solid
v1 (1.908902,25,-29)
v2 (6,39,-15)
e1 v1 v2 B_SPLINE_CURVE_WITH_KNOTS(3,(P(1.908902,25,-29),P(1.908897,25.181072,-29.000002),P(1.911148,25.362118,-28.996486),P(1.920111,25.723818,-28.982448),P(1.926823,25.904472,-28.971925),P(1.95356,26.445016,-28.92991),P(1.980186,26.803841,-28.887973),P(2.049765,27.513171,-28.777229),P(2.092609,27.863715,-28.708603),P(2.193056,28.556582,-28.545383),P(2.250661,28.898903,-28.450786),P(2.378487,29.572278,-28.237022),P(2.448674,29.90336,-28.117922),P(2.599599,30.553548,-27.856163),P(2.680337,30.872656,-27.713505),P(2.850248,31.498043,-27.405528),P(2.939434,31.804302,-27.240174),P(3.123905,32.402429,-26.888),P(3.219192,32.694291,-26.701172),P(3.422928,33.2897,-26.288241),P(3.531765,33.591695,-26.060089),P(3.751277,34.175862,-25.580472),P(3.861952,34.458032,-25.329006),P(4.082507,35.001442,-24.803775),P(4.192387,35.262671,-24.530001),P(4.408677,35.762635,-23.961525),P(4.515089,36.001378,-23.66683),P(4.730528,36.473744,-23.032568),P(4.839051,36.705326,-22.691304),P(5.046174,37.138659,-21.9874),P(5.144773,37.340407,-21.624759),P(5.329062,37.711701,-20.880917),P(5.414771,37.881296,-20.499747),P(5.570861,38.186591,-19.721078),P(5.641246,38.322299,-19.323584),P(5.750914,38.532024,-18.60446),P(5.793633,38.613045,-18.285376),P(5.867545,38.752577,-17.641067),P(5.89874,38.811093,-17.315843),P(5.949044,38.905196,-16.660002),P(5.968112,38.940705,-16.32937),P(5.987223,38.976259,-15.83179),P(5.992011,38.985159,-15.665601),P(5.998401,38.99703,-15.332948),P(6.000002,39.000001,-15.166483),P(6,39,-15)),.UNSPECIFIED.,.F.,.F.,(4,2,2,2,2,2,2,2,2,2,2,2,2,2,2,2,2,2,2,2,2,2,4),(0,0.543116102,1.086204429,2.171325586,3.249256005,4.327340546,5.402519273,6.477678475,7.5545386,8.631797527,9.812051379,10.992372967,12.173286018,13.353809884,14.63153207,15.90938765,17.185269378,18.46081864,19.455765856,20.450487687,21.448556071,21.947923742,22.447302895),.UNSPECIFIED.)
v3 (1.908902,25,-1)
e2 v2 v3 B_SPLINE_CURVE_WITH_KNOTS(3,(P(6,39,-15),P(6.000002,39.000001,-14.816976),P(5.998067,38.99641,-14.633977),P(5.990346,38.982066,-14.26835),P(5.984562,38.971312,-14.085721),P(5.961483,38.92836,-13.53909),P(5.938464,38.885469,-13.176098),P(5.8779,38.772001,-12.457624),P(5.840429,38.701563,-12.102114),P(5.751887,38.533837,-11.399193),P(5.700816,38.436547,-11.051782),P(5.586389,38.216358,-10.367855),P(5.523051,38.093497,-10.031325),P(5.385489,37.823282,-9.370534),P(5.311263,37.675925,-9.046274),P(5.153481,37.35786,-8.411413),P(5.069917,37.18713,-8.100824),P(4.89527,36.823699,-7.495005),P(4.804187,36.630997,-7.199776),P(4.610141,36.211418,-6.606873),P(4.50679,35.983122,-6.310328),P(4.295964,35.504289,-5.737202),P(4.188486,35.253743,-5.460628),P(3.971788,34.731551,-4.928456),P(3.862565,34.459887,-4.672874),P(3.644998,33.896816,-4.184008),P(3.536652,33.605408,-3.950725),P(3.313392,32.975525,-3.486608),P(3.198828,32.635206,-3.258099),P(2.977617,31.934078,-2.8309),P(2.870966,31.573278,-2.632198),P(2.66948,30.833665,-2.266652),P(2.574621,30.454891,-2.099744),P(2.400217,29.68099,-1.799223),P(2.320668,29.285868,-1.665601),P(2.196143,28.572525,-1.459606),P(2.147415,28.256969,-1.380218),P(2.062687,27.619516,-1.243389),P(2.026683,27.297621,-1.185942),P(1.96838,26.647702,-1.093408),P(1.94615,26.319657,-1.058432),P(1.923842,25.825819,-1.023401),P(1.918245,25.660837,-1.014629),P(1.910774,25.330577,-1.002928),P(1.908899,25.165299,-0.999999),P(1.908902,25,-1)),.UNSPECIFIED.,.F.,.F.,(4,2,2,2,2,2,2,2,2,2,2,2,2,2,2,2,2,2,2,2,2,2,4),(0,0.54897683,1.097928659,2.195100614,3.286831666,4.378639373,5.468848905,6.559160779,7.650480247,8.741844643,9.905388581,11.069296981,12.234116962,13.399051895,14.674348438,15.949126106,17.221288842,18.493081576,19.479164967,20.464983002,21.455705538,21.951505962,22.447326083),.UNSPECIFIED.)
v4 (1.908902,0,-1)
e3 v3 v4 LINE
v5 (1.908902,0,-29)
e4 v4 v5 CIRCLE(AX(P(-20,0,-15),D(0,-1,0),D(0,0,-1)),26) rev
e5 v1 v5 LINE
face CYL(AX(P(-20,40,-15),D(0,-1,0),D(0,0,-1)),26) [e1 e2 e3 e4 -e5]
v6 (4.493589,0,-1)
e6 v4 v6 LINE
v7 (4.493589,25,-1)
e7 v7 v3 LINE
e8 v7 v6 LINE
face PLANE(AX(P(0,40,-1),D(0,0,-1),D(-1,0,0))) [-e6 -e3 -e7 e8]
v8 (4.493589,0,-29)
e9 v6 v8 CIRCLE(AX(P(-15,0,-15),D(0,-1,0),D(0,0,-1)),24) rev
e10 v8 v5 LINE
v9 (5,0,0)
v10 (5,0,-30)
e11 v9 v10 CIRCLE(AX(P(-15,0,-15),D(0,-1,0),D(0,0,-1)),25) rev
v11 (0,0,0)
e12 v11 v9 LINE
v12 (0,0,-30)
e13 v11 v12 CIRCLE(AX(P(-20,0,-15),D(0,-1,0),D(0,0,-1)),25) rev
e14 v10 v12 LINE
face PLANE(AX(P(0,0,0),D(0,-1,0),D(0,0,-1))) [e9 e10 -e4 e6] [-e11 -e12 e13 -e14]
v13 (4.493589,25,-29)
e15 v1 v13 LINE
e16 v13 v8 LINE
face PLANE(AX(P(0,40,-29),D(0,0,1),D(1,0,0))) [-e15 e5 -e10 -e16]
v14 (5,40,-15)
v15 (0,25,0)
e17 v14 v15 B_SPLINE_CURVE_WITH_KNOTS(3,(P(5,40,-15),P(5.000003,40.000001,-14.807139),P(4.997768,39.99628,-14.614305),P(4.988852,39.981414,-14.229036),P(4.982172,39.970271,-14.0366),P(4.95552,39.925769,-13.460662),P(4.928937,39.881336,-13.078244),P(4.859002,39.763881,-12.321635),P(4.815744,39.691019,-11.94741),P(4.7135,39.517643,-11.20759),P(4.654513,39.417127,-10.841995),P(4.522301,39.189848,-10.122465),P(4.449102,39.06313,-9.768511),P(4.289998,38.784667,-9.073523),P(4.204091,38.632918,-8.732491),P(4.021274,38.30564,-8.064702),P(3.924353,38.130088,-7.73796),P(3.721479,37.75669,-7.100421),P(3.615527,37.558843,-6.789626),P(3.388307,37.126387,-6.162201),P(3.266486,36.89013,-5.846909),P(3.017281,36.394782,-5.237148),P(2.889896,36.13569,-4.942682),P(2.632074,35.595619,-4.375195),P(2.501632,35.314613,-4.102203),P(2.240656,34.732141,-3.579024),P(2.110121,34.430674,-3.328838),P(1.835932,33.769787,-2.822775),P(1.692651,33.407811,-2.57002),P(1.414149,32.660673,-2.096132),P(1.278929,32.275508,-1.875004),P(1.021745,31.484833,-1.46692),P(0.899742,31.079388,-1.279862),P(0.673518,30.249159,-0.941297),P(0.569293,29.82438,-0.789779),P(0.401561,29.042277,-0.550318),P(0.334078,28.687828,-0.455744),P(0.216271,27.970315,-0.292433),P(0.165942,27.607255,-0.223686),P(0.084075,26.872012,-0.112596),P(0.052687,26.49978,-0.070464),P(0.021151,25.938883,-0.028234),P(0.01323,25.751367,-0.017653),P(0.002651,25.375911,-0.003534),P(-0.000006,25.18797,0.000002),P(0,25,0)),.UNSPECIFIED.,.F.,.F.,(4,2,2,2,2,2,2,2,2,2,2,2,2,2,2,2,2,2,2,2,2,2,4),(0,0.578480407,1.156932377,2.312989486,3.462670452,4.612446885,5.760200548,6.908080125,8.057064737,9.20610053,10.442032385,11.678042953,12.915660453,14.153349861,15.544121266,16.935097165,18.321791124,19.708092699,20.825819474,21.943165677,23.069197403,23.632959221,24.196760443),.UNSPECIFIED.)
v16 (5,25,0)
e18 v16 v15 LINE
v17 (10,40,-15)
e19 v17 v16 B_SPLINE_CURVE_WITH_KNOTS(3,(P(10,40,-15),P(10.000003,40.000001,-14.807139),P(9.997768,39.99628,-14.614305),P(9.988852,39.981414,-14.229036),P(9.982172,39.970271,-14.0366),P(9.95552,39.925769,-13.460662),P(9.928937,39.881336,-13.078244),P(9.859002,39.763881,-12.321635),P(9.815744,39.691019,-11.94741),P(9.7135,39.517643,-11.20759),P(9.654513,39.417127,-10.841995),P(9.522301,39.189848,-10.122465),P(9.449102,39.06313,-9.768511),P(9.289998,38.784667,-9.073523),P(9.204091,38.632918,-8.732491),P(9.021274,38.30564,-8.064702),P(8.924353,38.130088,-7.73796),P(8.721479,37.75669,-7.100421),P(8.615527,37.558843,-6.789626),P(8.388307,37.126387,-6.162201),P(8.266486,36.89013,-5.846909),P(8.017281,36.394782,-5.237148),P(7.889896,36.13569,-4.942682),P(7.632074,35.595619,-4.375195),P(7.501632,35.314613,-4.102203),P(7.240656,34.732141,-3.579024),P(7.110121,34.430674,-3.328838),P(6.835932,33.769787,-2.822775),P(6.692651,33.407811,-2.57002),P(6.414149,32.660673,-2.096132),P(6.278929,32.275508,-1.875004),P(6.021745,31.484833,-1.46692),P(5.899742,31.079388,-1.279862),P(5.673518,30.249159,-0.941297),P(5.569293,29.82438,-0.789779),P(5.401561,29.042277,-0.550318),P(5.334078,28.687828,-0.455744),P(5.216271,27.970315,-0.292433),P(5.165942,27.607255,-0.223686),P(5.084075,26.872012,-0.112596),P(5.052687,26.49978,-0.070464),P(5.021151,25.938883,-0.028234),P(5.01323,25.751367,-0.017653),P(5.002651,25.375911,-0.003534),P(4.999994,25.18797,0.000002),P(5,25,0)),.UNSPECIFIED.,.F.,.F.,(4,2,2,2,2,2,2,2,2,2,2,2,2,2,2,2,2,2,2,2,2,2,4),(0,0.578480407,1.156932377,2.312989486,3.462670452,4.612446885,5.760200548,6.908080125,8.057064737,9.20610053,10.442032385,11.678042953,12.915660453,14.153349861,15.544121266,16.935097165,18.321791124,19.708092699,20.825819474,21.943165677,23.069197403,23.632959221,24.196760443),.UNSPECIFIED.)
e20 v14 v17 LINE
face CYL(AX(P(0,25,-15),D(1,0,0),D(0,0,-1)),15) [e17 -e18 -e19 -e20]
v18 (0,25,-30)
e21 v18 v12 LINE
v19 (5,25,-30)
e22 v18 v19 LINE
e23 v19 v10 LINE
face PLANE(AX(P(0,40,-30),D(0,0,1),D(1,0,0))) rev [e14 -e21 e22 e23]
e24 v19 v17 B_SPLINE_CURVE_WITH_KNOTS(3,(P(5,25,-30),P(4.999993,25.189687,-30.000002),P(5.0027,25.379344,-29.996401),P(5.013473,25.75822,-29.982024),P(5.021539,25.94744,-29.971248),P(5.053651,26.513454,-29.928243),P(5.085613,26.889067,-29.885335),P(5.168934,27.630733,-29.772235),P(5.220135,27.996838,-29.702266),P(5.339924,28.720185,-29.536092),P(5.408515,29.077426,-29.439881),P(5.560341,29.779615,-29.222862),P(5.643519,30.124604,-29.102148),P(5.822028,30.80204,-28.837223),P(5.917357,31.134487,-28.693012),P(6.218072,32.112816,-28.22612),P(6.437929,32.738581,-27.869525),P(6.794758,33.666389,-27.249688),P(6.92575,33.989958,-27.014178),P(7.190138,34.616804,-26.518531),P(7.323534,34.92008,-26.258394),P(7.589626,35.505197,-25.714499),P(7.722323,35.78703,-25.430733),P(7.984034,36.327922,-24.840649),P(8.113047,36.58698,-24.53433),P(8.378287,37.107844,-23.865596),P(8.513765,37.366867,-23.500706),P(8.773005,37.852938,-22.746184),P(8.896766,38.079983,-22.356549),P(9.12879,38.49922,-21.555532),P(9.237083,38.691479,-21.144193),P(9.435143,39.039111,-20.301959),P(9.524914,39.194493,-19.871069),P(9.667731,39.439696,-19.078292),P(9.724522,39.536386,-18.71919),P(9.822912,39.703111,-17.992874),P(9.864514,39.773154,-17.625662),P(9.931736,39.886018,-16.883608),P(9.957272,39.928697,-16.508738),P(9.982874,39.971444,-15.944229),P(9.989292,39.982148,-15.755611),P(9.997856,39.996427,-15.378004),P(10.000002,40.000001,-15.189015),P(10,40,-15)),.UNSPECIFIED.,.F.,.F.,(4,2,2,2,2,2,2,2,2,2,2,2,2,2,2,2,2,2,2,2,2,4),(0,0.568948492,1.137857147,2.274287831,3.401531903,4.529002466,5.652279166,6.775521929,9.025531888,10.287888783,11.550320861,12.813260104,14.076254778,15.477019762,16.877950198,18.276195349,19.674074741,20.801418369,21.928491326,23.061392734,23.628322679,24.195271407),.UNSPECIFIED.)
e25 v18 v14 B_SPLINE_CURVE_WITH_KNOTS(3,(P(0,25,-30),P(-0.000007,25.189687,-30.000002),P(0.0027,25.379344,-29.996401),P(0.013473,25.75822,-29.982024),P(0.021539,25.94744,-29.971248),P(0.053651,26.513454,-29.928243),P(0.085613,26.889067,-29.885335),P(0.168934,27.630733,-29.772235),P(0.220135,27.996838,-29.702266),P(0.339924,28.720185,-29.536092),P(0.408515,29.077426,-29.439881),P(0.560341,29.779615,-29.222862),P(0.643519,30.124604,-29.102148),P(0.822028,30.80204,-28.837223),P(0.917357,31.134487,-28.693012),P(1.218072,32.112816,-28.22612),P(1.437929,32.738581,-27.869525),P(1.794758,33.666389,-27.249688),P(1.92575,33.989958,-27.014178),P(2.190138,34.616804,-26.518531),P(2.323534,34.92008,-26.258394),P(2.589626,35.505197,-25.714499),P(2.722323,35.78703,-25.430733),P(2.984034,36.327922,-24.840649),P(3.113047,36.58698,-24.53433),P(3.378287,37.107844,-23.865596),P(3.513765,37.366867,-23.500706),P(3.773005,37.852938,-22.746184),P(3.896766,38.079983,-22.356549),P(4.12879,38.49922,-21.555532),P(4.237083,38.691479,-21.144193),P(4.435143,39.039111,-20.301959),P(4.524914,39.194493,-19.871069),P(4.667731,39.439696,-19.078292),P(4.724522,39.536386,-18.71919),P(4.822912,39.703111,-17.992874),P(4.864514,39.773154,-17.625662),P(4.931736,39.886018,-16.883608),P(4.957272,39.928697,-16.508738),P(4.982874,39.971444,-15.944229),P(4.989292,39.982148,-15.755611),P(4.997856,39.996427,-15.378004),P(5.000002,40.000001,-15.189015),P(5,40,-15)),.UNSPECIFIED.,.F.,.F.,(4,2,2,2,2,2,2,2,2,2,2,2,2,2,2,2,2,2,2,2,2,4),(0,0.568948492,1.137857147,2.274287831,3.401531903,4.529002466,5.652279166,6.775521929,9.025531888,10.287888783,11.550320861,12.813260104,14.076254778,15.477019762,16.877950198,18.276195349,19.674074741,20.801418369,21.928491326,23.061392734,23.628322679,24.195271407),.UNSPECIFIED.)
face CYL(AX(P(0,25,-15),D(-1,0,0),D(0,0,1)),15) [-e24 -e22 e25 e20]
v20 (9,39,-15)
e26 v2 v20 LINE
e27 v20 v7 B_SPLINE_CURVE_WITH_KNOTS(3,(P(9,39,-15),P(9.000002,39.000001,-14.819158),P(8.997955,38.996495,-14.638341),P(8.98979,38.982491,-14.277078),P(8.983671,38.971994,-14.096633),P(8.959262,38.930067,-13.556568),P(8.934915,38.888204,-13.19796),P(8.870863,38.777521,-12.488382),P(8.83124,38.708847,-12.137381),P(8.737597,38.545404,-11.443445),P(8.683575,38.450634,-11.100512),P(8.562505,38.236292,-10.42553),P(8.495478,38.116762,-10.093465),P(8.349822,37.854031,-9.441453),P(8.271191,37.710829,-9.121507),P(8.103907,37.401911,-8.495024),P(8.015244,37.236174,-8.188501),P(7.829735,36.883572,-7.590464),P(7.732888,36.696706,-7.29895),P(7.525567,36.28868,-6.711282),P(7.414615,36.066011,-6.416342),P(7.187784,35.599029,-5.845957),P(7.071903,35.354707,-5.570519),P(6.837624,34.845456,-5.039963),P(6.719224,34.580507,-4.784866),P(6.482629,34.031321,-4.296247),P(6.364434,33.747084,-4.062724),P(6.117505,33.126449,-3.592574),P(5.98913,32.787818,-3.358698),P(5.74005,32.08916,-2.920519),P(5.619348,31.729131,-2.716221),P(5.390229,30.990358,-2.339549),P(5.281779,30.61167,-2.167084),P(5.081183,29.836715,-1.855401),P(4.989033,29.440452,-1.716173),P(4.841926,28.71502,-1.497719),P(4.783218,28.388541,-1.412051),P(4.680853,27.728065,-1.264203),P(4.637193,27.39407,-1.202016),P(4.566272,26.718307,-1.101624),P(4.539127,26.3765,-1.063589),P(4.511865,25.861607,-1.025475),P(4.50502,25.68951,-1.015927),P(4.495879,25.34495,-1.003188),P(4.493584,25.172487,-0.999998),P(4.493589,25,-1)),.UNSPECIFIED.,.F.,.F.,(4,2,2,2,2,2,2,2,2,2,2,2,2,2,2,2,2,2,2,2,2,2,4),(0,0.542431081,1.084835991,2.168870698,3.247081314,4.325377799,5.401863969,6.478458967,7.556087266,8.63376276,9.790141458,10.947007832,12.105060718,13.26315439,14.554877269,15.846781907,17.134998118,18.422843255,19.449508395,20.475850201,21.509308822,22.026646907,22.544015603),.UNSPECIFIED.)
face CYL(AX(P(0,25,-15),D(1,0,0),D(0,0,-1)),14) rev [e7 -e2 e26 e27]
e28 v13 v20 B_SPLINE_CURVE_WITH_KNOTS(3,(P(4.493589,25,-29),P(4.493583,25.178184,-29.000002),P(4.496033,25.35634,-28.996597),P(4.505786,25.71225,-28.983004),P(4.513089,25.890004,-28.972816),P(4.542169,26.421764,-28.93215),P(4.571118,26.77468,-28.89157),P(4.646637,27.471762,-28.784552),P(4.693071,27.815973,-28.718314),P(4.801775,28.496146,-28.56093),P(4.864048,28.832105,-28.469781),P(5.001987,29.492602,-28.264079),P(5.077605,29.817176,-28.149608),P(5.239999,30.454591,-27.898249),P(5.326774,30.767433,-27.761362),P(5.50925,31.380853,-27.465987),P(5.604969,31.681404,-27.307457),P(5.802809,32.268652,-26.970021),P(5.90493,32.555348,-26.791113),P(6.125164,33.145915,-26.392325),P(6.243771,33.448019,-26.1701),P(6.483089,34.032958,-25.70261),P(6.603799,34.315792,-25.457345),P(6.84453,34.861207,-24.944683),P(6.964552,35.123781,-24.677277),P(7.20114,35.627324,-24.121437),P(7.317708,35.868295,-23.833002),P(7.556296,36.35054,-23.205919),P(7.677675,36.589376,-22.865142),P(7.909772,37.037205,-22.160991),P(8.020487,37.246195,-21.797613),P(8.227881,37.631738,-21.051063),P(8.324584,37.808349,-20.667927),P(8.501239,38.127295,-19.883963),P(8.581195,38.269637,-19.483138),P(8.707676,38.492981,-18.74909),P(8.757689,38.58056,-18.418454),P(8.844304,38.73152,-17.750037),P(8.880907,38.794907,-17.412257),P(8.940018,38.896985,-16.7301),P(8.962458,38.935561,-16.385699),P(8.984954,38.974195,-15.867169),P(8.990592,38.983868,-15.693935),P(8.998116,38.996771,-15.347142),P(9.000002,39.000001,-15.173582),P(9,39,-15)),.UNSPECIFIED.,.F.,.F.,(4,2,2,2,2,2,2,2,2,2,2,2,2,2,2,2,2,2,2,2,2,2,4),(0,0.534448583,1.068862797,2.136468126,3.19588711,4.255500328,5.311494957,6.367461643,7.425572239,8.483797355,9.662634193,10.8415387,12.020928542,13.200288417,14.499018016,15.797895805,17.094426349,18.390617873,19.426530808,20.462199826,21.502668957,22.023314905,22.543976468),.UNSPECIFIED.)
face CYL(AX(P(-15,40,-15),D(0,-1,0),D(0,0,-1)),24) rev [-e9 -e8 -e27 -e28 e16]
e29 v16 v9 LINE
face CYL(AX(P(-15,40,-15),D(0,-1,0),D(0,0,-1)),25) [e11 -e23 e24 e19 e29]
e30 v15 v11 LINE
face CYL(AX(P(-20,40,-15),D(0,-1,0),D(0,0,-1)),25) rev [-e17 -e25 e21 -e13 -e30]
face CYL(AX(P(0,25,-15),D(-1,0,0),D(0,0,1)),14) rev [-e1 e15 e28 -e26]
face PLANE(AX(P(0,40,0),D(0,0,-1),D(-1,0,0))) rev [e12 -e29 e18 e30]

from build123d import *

# Parameters (mm, degrees)
SKETCH1_W           = 10
SKETCH1_H           = 30
BOSS_EXTRUDE1_DEPTH = 40
FILLET1_R           = 15
CUT_EXTRUDE1_DEPTH  = 40
SHELL2_T            = -1


with BuildPart() as part:
    # Sketch1 → Boss-Extrude1 (new body)
    with BuildSketch(Plane(origin=(0, 0, 0), x_dir=(1, 0, 0), z_dir=(0, 1, 0))):
        with Locations((5, 15)):
            Rectangle(SKETCH1_W, SKETCH1_H)
    extrude(amount=BOSS_EXTRUDE1_DEPTH)

    # Fillet1
    fillet1_edges = [part.edges().sort_by_distance(p)[0] for p in [
        (5, 40, -30),
        (5, 40, 0),
    ]]
    fillet(fillet1_edges, radius=FILLET1_R - 0.0001)  # a hair under: the kernel refuses the full size

    # Sketch2 → Cut-Extrude1 (cut)
    with BuildSketch(Plane.XZ):
        with BuildLine():
            Line((10, 0), (5, 0))
            ThreePointArc((5, 0), (8.717082451, -7.09430585), (10, -15))
            Line((10, -15), (10, 0))
        make_face()
        with BuildLine():
            Line((10, -30), (10, -15))
            ThreePointArc((10, -15), (8.717082451, -22.90569415), (5, -30))
            Line((5, -30), (10, -30))
        make_face()
        with BuildLine():
            ThreePointArc((0, 0), (5, -15), (0, -30))
            Line((0, -30), (0, 0))
        make_face()
    extrude(amount=-CUT_EXTRUDE1_DEPTH, mode=Mode.SUBTRACT)

    # Shell2
    shell2_openings = [part.faces().sort_by_distance(p)[0] for p in [
        (5.9062731, 0, -15),
    ]]
    offset(amount=SHELL2_T, openings=shell2_openings)


solid = part.part
